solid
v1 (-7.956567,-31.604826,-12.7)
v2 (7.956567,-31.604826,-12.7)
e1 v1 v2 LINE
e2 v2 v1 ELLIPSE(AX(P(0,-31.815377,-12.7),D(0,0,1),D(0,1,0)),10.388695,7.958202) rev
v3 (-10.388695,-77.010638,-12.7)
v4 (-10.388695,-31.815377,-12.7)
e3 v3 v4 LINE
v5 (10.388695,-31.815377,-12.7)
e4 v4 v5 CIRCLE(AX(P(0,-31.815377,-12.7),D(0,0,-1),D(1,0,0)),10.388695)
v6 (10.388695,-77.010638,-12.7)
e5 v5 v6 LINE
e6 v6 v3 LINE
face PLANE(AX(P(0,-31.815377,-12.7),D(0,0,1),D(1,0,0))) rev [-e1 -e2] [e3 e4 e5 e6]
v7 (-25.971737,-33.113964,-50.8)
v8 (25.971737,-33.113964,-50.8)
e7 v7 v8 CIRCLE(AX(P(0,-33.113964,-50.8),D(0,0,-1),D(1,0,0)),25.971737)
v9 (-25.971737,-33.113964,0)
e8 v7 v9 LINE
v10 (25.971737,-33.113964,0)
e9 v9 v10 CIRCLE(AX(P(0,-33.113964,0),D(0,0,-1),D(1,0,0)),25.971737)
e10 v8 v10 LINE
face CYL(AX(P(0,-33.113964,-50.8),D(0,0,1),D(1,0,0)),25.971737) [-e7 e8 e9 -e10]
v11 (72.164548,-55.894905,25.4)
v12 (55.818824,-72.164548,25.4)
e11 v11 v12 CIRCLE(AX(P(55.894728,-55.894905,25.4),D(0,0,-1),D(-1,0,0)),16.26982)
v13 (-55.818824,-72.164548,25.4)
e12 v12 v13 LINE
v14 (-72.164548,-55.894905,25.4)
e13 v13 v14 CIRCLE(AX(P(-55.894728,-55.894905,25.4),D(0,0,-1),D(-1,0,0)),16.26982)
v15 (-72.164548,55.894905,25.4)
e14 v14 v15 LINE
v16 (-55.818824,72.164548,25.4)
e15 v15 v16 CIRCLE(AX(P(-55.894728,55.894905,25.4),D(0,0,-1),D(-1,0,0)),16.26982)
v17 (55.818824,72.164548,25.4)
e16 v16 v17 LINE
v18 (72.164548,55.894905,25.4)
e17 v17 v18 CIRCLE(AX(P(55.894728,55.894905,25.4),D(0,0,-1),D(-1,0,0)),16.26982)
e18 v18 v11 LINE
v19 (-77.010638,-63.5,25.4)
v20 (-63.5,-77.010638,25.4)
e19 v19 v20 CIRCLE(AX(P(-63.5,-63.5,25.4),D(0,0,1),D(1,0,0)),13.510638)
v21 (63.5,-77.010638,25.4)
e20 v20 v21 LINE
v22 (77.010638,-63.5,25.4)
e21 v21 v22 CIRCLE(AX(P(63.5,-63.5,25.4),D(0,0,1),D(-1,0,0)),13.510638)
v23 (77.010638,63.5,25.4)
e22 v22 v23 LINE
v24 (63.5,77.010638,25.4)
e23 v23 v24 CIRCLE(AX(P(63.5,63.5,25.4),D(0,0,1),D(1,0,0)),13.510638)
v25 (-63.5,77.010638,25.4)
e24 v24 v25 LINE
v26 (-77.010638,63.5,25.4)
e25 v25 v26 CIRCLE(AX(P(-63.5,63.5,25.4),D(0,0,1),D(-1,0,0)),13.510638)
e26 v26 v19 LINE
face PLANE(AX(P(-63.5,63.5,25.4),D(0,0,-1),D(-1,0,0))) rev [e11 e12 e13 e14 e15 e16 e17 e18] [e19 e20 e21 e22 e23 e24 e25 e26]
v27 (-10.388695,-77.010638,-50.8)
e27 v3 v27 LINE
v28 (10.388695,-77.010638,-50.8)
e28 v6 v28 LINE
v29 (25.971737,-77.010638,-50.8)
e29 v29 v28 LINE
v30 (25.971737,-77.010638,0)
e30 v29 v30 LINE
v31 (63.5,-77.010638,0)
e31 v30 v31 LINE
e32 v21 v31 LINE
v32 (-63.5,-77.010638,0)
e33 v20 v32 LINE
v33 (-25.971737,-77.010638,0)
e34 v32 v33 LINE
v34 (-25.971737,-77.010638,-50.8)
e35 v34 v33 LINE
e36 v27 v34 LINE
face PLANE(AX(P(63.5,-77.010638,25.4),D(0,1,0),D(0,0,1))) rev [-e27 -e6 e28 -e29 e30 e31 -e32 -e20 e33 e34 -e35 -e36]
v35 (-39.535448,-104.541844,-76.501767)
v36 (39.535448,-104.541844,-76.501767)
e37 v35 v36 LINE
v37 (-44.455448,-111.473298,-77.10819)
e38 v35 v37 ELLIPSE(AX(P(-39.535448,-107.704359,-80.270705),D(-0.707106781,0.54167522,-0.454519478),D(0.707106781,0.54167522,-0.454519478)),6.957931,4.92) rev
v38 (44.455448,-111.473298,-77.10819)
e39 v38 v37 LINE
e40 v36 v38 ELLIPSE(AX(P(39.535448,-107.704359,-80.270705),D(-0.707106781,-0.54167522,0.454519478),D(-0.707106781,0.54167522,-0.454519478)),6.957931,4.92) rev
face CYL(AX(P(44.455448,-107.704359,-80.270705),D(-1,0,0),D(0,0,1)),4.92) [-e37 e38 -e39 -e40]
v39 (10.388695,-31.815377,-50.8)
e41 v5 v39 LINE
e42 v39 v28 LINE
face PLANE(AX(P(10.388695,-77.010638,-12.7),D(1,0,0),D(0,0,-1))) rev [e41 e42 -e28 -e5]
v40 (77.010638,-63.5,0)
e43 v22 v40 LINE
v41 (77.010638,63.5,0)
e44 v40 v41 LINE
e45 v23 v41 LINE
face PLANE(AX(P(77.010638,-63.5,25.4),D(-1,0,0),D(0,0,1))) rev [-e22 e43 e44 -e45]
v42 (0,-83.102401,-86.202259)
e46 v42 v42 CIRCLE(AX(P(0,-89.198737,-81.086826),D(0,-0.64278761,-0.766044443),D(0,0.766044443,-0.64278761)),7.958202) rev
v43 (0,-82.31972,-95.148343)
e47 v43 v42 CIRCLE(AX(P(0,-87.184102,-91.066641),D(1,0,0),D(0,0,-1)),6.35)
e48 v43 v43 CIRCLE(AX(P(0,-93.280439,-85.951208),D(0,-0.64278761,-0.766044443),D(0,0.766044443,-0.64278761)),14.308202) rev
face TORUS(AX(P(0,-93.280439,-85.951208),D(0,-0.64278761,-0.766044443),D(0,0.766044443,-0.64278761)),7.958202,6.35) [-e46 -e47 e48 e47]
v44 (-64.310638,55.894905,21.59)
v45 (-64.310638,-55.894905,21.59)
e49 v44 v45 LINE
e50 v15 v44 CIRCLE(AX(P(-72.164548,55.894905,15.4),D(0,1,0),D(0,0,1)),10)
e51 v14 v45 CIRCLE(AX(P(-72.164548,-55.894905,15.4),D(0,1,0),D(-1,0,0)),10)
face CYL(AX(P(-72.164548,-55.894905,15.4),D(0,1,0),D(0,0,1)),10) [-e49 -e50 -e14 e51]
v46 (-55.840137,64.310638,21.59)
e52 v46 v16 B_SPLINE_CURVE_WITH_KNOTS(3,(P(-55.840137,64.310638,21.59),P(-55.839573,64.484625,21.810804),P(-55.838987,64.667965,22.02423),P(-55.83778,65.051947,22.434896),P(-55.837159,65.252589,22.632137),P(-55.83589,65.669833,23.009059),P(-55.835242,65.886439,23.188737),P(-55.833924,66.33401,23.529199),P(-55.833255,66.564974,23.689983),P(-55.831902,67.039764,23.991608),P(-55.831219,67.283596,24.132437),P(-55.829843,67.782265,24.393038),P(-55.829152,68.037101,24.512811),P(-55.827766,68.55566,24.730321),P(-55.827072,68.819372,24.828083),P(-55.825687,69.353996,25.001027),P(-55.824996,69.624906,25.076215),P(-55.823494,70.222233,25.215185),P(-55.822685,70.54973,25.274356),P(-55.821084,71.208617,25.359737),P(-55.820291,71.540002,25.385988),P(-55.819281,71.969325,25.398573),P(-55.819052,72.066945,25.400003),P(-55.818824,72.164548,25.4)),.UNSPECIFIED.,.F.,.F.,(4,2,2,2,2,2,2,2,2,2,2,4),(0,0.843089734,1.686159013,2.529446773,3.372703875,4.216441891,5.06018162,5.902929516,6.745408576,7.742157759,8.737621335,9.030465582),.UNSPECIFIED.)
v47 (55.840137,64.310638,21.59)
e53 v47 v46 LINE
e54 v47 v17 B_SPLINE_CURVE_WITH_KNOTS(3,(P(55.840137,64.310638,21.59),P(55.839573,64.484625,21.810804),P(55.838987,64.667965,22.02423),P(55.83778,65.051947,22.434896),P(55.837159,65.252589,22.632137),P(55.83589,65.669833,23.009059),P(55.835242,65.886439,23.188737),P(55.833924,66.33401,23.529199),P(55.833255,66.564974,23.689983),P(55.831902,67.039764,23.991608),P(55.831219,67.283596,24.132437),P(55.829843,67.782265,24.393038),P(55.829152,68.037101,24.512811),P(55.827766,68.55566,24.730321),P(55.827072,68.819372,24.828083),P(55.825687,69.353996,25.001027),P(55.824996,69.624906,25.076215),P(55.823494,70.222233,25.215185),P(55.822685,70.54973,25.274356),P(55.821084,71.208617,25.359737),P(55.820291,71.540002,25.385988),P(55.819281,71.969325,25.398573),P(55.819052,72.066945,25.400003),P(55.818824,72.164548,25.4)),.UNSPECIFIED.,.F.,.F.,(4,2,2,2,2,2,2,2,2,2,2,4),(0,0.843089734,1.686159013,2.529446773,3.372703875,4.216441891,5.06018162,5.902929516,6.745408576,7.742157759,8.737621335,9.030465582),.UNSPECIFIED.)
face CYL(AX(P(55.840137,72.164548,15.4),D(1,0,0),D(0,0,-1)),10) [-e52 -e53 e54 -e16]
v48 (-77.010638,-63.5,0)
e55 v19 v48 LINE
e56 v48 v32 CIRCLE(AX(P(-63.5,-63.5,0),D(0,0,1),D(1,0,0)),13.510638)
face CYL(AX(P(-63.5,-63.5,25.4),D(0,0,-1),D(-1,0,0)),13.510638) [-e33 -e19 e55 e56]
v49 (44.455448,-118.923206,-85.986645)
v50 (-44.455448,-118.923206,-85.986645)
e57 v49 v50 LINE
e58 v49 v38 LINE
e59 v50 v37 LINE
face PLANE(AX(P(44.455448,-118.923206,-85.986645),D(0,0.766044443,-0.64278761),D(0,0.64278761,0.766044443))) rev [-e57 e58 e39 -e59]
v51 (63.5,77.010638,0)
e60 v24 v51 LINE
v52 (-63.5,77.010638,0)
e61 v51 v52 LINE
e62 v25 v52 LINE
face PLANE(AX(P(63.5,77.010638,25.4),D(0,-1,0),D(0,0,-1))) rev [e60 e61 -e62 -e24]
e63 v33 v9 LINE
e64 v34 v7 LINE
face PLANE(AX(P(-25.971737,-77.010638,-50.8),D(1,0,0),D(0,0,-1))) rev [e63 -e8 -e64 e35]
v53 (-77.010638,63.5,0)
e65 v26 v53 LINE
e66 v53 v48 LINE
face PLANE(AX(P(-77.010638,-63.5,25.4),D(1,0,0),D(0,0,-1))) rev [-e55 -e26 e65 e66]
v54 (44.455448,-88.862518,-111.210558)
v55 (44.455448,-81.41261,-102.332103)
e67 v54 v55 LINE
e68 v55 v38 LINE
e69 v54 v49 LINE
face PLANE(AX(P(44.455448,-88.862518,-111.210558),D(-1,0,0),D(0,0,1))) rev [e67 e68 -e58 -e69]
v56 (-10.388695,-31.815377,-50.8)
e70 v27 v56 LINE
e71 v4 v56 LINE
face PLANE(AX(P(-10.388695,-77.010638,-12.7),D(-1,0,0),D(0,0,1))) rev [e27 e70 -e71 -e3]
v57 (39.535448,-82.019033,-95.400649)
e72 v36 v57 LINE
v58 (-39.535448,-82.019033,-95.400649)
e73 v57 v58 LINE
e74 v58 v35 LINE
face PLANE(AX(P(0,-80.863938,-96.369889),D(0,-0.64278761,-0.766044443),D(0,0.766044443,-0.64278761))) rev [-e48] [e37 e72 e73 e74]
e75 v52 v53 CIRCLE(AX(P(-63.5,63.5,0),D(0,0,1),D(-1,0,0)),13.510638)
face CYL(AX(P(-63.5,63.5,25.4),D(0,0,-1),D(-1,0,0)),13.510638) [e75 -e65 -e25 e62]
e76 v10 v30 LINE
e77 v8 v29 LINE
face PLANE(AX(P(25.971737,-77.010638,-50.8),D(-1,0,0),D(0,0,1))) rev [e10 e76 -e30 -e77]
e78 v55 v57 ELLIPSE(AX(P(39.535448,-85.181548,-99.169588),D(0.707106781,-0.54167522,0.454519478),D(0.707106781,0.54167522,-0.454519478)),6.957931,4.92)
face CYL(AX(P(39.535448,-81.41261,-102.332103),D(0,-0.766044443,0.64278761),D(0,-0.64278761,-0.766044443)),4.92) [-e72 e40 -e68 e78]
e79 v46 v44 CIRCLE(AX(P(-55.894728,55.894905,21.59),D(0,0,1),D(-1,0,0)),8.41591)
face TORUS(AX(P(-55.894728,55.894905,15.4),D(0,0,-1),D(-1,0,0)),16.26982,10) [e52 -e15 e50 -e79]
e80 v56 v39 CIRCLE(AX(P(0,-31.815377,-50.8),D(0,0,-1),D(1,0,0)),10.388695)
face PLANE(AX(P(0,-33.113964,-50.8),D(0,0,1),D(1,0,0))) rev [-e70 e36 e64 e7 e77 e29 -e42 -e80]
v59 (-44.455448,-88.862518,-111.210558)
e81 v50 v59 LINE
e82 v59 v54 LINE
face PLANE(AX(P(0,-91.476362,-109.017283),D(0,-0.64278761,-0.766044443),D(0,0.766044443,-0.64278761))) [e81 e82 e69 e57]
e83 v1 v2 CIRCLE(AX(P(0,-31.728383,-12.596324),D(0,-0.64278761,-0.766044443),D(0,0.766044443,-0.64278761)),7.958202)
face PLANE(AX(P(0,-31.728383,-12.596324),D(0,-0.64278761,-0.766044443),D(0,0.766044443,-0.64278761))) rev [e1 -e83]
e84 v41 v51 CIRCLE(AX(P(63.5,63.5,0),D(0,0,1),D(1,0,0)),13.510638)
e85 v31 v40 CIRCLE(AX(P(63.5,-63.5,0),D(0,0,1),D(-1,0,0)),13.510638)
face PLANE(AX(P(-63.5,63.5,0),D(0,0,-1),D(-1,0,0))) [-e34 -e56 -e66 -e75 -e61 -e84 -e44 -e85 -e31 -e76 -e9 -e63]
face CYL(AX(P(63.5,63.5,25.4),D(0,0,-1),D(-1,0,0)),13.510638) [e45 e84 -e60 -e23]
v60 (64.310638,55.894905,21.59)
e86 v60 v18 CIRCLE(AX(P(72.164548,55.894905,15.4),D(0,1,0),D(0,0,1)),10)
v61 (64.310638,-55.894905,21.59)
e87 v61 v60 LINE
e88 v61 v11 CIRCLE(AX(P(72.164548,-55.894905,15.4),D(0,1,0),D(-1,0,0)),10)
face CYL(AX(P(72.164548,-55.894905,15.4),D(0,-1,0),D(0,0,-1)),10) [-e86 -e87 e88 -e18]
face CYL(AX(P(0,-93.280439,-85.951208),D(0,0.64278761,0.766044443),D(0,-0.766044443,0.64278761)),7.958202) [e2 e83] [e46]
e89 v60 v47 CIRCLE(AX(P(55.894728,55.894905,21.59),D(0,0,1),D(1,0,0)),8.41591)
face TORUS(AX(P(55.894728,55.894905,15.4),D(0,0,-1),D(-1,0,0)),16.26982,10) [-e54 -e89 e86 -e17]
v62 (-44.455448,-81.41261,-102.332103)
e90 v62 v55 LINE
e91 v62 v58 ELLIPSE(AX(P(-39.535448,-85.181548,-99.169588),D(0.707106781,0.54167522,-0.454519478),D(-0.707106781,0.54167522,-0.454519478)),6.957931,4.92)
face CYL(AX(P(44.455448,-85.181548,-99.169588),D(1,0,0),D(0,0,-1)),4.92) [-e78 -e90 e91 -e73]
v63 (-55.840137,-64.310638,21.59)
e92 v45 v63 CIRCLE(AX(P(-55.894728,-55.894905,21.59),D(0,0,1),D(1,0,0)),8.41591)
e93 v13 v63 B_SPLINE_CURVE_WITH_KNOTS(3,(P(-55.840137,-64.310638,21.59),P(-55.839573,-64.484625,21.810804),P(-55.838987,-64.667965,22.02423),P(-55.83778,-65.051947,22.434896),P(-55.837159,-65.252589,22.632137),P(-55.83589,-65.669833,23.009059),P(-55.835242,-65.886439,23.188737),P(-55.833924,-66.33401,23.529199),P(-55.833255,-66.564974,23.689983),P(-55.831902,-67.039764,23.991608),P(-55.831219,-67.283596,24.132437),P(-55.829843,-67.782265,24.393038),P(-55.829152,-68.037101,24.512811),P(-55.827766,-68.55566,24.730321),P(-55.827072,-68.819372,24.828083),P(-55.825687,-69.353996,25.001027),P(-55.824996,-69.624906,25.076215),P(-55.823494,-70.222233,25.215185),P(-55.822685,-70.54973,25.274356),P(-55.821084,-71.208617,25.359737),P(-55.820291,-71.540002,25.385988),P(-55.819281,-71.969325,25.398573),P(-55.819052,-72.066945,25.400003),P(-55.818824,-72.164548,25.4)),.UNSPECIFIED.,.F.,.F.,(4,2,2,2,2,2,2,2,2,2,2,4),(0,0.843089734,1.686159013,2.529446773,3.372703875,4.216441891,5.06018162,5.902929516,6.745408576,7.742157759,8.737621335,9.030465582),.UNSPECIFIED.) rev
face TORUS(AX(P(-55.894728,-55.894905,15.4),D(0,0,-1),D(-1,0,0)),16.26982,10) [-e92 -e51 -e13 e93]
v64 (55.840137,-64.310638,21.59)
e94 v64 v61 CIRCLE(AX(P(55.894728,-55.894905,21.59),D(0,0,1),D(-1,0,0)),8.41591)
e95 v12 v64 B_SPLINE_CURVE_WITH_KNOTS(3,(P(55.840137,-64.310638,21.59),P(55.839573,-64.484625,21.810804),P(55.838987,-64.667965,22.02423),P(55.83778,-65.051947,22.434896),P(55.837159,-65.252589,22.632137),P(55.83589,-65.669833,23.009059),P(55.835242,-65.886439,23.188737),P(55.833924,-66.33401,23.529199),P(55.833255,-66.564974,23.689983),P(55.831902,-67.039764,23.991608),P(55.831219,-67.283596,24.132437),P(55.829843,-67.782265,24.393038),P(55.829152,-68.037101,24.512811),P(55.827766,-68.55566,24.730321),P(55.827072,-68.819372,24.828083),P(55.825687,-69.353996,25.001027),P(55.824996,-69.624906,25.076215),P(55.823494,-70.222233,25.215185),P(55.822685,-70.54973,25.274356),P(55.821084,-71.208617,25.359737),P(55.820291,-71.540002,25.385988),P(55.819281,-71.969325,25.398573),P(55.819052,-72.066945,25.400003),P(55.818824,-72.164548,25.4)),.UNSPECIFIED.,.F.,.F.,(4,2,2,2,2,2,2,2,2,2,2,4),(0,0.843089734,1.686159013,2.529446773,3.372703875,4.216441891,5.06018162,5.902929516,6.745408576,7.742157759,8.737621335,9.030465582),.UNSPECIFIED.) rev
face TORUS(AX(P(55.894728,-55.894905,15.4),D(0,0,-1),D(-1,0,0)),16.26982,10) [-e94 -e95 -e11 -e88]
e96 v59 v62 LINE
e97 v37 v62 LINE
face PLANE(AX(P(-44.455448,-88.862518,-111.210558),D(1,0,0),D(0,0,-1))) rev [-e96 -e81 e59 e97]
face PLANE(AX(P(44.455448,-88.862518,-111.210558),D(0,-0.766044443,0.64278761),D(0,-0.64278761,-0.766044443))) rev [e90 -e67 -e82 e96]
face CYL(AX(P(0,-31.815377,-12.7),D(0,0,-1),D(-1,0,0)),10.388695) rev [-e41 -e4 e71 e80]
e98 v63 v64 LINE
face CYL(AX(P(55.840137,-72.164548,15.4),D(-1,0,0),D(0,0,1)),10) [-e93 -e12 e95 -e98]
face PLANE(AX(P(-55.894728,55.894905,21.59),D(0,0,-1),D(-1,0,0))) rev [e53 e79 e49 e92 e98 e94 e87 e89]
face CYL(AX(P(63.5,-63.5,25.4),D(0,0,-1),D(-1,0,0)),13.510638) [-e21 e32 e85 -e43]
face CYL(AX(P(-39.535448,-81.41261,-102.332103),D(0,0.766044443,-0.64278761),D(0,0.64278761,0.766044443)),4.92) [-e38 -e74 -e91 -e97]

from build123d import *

# Parameters (mm, degrees)
BOSS_EXTRUDE1_DEPTH     = 25.4
CUT_EXTRUDE1_DEPTH      = 0.25399999999999945
CUT_EXTRUDE1_DEPTH_BACK = 3.8099999999999814
BOSS_EXTRUDE3_DEPTH     = 50.8
CUT_EXTRUDE3_DEPTH      = 38.1
SKETCH9_R               = 7.958201772862371
BOSS_EXTRUDE4_DEPTH     = 95.75799999999995
SKETCH11_W              = 88.91089611657237
SKETCH11_H              = 39.241441418777725
BOSS_EXTRUDE5_DEPTH     = 16.509999999999938
FILLET2_R               = 10
FILLET3_R               = 4.919999999999999


# Read off the part's stored shape, not the designer's step: Sweep1
with BuildPart() as part:
    # Sketch1 → Boss-Extrude1 (new body)
    with BuildSketch(Plane.XY):
        with BuildLine():
            Line((63.5, 77.01063829787236), (-63.5, 77.01063829787236))
            ThreePointArc((-63.5, 77.01063829787236), (-73.05346395858422, 73.05346395858422), (-77.01063829787236, 63.5))
            Line((-77.01063829787236, 63.5), (-77.01063829787236, -63.5))
            ThreePointArc((-77.01063829787236, -63.5), (-73.05346395858422, -73.05346395858422), (-63.5, -77.01063829787236))
            Line((-63.5, -77.01063829787236), (63.5, -77.01063829787236))
            ThreePointArc((63.5, -77.01063829787236), (73.05346395858422, -73.05346395858423), (77.01063829787236, -63.500000000000014))
            Line((77.01063829787236, -63.500000000000014), (77.01063829787236, 63.500000000000014))
            ThreePointArc((77.01063829787236, 63.500000000000014), (73.05346395858422, 73.05346395858423), (63.5, 77.01063829787236))
        make_face()
    extrude(amount=BOSS_EXTRUDE1_DEPTH)

    # Sketch3 → Cut-Extrude1 (cut, two sides: drawn at the far end of the back side and taken through both)
    with BuildSketch(Plane.XY.offset(25.4).offset(-CUT_EXTRUDE1_DEPTH_BACK)):
        with BuildLine():
            Line((-64.31063829787236, -55.89490495185724), (-64.31063829787236, 55.89490495185724))
            ThreePointArc((-64.31063829787236, 55.89490495185724), (-61.826342998624284, 61.86512188051967), (-55.84013695793273, 64.31063829787234))
            Line((-55.84013695793273, 64.31063829787234), (55.84013695793273, 64.31063829787234))
            ThreePointArc((55.84013695793273, 64.31063829787234), (61.826342998624284, 61.86512188051967), (64.31063829787236, 55.89490495185724))
            Line((64.31063829787236, 55.89490495185724), (64.31063829787236, -55.89490495185724))
            ThreePointArc((64.31063829787236, -55.89490495185724), (61.826342998624284, -61.86512188051967), (55.84013695793273, -64.31063829787234))
            Line((55.84013695793273, -64.31063829787234), (-55.84013695793273, -64.31063829787234))
            ThreePointArc((-55.84013695793273, -64.31063829787234), (-61.826342998624284, -61.86512188051967), (-64.31063829787236, -55.89490495185724))
        make_face()
    extrude(amount=CUT_EXTRUDE1_DEPTH + CUT_EXTRUDE1_DEPTH_BACK, mode=Mode.SUBTRACT)

    # Sketch7 → Boss-Extrude3 (add)
    with BuildSketch(Plane(origin=(0, 0, 0), x_dir=(-1, 0, 0), z_dir=(0, 0, -1))):
        with BuildLine():
            Line((-25.971736510678774, -77.01063829787236), (25.971736510678774, -77.0106382978723))
            Line((25.971736510678774, -77.0106382978723), (25.971736510678774, -33.11396405111534))
            ThreePointArc((25.971736510678774, -33.11396405111534), (-4.77e-15, -7.142227540436579), (-25.971736510678774, -33.11396405111537))
            Line((-25.971736510678774, -33.11396405111537), (-25.971736510678774, -77.01063829787236))
        make_face()
    extrude(amount=BOSS_EXTRUDE3_DEPTH)

    # Sketch8 → Cut-Extrude3 (cut)
    with BuildSketch(Plane(origin=(0, 0, -50.8), x_dir=(-1, 0, 0), z_dir=(0, 0, -1))):
        with BuildLine():
            Line((-10.388694604271498, -77.01063829787235), (-10.388694604271498, -31.815377225581233))
            ThreePointArc((-10.388694604271498, -31.815377225581233), (6.4e-16, -21.426682621309737), (10.388694604271498, -31.815377225581233))
            Line((10.388694604271498, -31.815377225581233), (10.388694604271498, -77.01063829787235))
            Line((10.388694604271498, -77.01063829787235), (-10.388694604271498, -77.01063829787235))
        make_face()
    extrude(amount=-CUT_EXTRUDE3_DEPTH, mode=Mode.SUBTRACT)

    # Sketch9 → Boss-Extrude4 (add)
    with BuildSketch(Plane(origin=(0, -19.311882184983943, -23.015004973711303), x_dir=(1, 0, 0), z_dir=(0, -0.6427876096865301, -0.7660444431189859))):
        with Locations(Location((0, 16.20859028637191, 0), (0, 0, 358.83868965))):
            Circle(SKETCH9_R)
    extrude(amount=BOSS_EXTRUDE4_DEPTH)



with BuildPart() as body_2:
    # Sketch11 → Boss-Extrude5 (new body)
    with BuildSketch(Plane(origin=(0, -80.86393811334668, -96.36988875789913), x_dir=(-1, 0, 0), z_dir=(0, -0.64278760968653, -0.766044443118986))):
        with Locations((0, -16.2085902863719)):
            Rectangle(SKETCH11_W, SKETCH11_H)
    extrude(amount=BOSS_EXTRUDE5_DEPTH)


with BuildPart() as part_1:
    add(part.part)

    add(body_2.part)  # Sweep1 merges body 2
    # Sweep1 outline → Sweep1 (revolve)
    with BuildSketch(Plane(origin=(0, -12.41650052, 10.418681007), x_dir=(1, 0, 0), z_dir=(0, -0.766044443118986, 0.64278760968653))):
        with BuildLine():
            ThreePointArc((14.308201773, -125.801955257), (12.448329834, -121.311827197), (7.958201773, -119.451955257))
            Line((7.958201773, -119.451955257), (7.958201773, -125.801955257))
            Line((7.958201773, -125.801955257), (14.308201773, -125.801955257))
        make_face()
    revolve(axis=Axis((0, -12.41650052, 10.418681007), (0, 0.64278760968653, 0.766044443118986)))

    # Fillet2
    # the kernel refuses this fillet: 10 mm, written as the material it takes off along each edge
    with BuildSketch(Plane(origin=(-55.894727894264214, 55.894904951857264, 25.4), x_dir=(-1, -2.53e-15, 0), z_dir=(2.53e-15, -1, 0))) as fillet2_piece_1:
        with BuildLine():
            CenterArc((16.269820257941824, 10), FILLET2_R, 218.24314589443497, 51.756854105565026)
            Line((8.415910403608144, 3.809999999999981), (8.258832206521468, 3.6861999999999817))
            ThreePointArc((8.258832206521468, 3.6861999999999817), (8.215910403608142, 1.9049999999999905), (8.215910403608142, 0))
            Line((8.215910403608142, 0), (8.415910403608144, -0.1999999999999993))
            Line((8.415910403608144, -0.1999999999999993), (16.269820257941824, -0.1999999999999993))
            Line((16.269820257941824, -0.1999999999999993), (16.269820257941824, 0))
        make_face()
    revolve(axis=Axis((-55.894727894264214, 55.894904951857264, 25.4), (0, 0, -1)), revolution_arc=90.37165939708579, mode=Mode.SUBTRACT)
    with BuildSketch(Plane(origin=(55.894727894264214, 55.894904951857264, 25.4), x_dir=(-0.00648663468518885, 0.9999789615639225, 0), z_dir=(-0.9999789615639225, -0.00648663468518885, 0))) as fillet2_piece_2:
        with BuildLine():
            CenterArc((16.269820257941824, 10), FILLET2_R, 218.24314589443495, 51.756854105565026)
            Line((8.415910403608141, 3.809999999999981), (8.258832206521465, 3.6861999999999817))
            ThreePointArc((8.258832206521465, 3.6861999999999817), (8.215910403608135, 1.9049999999999905), (8.215910403608135, 0))
            Line((8.215910403608135, 0), (8.415910403608141, -0.1999999999999993))
            Line((8.415910403608141, -0.1999999999999993), (16.269820257941824, -0.1999999999999993))
            Line((16.269820257941824, -0.1999999999999993), (16.269820257941824, 0))
        make_face()
    revolve(axis=Axis((55.894727894264214, 55.894904951857264, 25.4), (0, 0, -1)), revolution_arc=90.37165939708579, mode=Mode.SUBTRACT)
    with BuildSketch(Plane(origin=(64.31063829787236, -55.894904951857235, 25.4), x_dir=(1, 0, 0), z_dir=(0, 1, 0)), Plane(origin=(-64.31063829787236, 55.894904951857235, 25.4), x_dir=(-1, 0, 0), z_dir=(0, -1, 0))) as fillet2_piece_3:
        with BuildLine():
            CenterArc((7.853909854333679, 10), FILLET2_R, 218.24314589443497, 51.756854105565026)
            Line((0, 3.809999999999981), (-0.15707819708667614, 3.6861999999999817))
            ThreePointArc((-0.15707819708667614, 3.6861999999999817), (-0.20000000000000284, 1.9049999999999905), (-0.20000000000000284, 0))
            Line((-0.20000000000000284, 0), (0, -0.1999999999999993))
            Line((0, -0.1999999999999993), (7.853909854333679, -0.1999999999999993))
            Line((7.853909854333679, -0.1999999999999993), (7.853909854333679, 0))
        make_face()
    extrude(amount=111.78980990371448, mode=Mode.SUBTRACT)
    with BuildSketch(Plane(origin=(55.894727894264214, -55.894904951857264, 25.4), x_dir=(1, 2.53e-15, 0), z_dir=(-2.53e-15, 1, 0))) as fillet2_piece_4:
        with BuildLine():
            CenterArc((16.269820257941824, 10), FILLET2_R, 218.24314589443497, 51.756854105565026)
            Line((8.415910403608144, 3.809999999999981), (8.258832206521468, 3.6861999999999817))
            ThreePointArc((8.258832206521468, 3.6861999999999817), (8.215910403608142, 1.9049999999999905), (8.215910403608142, 0))
            Line((8.215910403608142, 0), (8.415910403608144, -0.1999999999999993))
            Line((8.415910403608144, -0.1999999999999993), (16.269820257941824, -0.1999999999999993))
            Line((16.269820257941824, -0.1999999999999993), (16.269820257941824, 0))
        make_face()
    revolve(axis=Axis((55.894727894264214, -55.894904951857264, 25.4), (0, 0, -1)), revolution_arc=90.37165939708579, mode=Mode.SUBTRACT)
    with BuildSketch(Plane(origin=(-55.840136957932735, -64.31063829787234, 25.4), x_dir=(0, -1, 0), z_dir=(1, 0, 0)), Plane(origin=(55.840136957932735, 64.31063829787234, 25.4), x_dir=(0, 1, 0), z_dir=(-1, 0, 0))) as fillet2_piece_5:
        with BuildLine():
            CenterArc((7.853909854333679, 10), FILLET2_R, 218.24314589443497, 51.756854105565026)
            Line((0, 3.809999999999981), (-0.15707819708667614, 3.6861999999999817))
            ThreePointArc((-0.15707819708667614, 3.6861999999999817), (-0.20000000000000284, 1.9049999999999905), (-0.20000000000000284, 0))
            Line((-0.20000000000000284, 0), (0, -0.1999999999999993))
            Line((0, -0.1999999999999993), (7.853909854333679, -0.1999999999999993))
            Line((7.853909854333679, -0.1999999999999993), (7.853909854333679, 0))
        make_face()
    extrude(amount=111.68027391586546, mode=Mode.SUBTRACT)
    with BuildSketch(Plane(origin=(-55.894727894264214, -55.894904951857264, 25.4), x_dir=(0.00648663468518885, -0.9999789615639225, 0), z_dir=(0.9999789615639225, 0.00648663468518885, 0))) as fillet2_piece_6:
        with BuildLine():
            CenterArc((16.269820257941824, 10), FILLET2_R, 218.24314589443495, 51.756854105565026)
            Line((8.415910403608141, 3.809999999999981), (8.258832206521465, 3.6861999999999817))
            ThreePointArc((8.258832206521465, 3.6861999999999817), (8.215910403608135, 1.9049999999999905), (8.215910403608135, 0))
            Line((8.215910403608135, 0), (8.415910403608141, -0.1999999999999993))
            Line((8.415910403608141, -0.1999999999999993), (16.269820257941824, -0.1999999999999993))
            Line((16.269820257941824, -0.1999999999999993), (16.269820257941824, 0))
        make_face()
    revolve(axis=Axis((-55.894727894264214, -55.894904951857264, 25.4), (0, 0, -1)), revolution_arc=90.37165939708579, mode=Mode.SUBTRACT)

    # Fillet3
    fillet3_edges = [part_1.edges().sort_by_distance(p)[0] for p in [
        (-44.45544805828619, -93.28043863301424, -85.95120775133383),
        (0, -78.2500945635973, -98.5631639164489),
        (44.45544805828619, -93.28043863301424, -85.95120775133383),
        (0, -108.3107827024312, -73.33925158621877),
    ]]
    fillet(fillet3_edges, radius=FILLET3_R)


solid = part_1.part
